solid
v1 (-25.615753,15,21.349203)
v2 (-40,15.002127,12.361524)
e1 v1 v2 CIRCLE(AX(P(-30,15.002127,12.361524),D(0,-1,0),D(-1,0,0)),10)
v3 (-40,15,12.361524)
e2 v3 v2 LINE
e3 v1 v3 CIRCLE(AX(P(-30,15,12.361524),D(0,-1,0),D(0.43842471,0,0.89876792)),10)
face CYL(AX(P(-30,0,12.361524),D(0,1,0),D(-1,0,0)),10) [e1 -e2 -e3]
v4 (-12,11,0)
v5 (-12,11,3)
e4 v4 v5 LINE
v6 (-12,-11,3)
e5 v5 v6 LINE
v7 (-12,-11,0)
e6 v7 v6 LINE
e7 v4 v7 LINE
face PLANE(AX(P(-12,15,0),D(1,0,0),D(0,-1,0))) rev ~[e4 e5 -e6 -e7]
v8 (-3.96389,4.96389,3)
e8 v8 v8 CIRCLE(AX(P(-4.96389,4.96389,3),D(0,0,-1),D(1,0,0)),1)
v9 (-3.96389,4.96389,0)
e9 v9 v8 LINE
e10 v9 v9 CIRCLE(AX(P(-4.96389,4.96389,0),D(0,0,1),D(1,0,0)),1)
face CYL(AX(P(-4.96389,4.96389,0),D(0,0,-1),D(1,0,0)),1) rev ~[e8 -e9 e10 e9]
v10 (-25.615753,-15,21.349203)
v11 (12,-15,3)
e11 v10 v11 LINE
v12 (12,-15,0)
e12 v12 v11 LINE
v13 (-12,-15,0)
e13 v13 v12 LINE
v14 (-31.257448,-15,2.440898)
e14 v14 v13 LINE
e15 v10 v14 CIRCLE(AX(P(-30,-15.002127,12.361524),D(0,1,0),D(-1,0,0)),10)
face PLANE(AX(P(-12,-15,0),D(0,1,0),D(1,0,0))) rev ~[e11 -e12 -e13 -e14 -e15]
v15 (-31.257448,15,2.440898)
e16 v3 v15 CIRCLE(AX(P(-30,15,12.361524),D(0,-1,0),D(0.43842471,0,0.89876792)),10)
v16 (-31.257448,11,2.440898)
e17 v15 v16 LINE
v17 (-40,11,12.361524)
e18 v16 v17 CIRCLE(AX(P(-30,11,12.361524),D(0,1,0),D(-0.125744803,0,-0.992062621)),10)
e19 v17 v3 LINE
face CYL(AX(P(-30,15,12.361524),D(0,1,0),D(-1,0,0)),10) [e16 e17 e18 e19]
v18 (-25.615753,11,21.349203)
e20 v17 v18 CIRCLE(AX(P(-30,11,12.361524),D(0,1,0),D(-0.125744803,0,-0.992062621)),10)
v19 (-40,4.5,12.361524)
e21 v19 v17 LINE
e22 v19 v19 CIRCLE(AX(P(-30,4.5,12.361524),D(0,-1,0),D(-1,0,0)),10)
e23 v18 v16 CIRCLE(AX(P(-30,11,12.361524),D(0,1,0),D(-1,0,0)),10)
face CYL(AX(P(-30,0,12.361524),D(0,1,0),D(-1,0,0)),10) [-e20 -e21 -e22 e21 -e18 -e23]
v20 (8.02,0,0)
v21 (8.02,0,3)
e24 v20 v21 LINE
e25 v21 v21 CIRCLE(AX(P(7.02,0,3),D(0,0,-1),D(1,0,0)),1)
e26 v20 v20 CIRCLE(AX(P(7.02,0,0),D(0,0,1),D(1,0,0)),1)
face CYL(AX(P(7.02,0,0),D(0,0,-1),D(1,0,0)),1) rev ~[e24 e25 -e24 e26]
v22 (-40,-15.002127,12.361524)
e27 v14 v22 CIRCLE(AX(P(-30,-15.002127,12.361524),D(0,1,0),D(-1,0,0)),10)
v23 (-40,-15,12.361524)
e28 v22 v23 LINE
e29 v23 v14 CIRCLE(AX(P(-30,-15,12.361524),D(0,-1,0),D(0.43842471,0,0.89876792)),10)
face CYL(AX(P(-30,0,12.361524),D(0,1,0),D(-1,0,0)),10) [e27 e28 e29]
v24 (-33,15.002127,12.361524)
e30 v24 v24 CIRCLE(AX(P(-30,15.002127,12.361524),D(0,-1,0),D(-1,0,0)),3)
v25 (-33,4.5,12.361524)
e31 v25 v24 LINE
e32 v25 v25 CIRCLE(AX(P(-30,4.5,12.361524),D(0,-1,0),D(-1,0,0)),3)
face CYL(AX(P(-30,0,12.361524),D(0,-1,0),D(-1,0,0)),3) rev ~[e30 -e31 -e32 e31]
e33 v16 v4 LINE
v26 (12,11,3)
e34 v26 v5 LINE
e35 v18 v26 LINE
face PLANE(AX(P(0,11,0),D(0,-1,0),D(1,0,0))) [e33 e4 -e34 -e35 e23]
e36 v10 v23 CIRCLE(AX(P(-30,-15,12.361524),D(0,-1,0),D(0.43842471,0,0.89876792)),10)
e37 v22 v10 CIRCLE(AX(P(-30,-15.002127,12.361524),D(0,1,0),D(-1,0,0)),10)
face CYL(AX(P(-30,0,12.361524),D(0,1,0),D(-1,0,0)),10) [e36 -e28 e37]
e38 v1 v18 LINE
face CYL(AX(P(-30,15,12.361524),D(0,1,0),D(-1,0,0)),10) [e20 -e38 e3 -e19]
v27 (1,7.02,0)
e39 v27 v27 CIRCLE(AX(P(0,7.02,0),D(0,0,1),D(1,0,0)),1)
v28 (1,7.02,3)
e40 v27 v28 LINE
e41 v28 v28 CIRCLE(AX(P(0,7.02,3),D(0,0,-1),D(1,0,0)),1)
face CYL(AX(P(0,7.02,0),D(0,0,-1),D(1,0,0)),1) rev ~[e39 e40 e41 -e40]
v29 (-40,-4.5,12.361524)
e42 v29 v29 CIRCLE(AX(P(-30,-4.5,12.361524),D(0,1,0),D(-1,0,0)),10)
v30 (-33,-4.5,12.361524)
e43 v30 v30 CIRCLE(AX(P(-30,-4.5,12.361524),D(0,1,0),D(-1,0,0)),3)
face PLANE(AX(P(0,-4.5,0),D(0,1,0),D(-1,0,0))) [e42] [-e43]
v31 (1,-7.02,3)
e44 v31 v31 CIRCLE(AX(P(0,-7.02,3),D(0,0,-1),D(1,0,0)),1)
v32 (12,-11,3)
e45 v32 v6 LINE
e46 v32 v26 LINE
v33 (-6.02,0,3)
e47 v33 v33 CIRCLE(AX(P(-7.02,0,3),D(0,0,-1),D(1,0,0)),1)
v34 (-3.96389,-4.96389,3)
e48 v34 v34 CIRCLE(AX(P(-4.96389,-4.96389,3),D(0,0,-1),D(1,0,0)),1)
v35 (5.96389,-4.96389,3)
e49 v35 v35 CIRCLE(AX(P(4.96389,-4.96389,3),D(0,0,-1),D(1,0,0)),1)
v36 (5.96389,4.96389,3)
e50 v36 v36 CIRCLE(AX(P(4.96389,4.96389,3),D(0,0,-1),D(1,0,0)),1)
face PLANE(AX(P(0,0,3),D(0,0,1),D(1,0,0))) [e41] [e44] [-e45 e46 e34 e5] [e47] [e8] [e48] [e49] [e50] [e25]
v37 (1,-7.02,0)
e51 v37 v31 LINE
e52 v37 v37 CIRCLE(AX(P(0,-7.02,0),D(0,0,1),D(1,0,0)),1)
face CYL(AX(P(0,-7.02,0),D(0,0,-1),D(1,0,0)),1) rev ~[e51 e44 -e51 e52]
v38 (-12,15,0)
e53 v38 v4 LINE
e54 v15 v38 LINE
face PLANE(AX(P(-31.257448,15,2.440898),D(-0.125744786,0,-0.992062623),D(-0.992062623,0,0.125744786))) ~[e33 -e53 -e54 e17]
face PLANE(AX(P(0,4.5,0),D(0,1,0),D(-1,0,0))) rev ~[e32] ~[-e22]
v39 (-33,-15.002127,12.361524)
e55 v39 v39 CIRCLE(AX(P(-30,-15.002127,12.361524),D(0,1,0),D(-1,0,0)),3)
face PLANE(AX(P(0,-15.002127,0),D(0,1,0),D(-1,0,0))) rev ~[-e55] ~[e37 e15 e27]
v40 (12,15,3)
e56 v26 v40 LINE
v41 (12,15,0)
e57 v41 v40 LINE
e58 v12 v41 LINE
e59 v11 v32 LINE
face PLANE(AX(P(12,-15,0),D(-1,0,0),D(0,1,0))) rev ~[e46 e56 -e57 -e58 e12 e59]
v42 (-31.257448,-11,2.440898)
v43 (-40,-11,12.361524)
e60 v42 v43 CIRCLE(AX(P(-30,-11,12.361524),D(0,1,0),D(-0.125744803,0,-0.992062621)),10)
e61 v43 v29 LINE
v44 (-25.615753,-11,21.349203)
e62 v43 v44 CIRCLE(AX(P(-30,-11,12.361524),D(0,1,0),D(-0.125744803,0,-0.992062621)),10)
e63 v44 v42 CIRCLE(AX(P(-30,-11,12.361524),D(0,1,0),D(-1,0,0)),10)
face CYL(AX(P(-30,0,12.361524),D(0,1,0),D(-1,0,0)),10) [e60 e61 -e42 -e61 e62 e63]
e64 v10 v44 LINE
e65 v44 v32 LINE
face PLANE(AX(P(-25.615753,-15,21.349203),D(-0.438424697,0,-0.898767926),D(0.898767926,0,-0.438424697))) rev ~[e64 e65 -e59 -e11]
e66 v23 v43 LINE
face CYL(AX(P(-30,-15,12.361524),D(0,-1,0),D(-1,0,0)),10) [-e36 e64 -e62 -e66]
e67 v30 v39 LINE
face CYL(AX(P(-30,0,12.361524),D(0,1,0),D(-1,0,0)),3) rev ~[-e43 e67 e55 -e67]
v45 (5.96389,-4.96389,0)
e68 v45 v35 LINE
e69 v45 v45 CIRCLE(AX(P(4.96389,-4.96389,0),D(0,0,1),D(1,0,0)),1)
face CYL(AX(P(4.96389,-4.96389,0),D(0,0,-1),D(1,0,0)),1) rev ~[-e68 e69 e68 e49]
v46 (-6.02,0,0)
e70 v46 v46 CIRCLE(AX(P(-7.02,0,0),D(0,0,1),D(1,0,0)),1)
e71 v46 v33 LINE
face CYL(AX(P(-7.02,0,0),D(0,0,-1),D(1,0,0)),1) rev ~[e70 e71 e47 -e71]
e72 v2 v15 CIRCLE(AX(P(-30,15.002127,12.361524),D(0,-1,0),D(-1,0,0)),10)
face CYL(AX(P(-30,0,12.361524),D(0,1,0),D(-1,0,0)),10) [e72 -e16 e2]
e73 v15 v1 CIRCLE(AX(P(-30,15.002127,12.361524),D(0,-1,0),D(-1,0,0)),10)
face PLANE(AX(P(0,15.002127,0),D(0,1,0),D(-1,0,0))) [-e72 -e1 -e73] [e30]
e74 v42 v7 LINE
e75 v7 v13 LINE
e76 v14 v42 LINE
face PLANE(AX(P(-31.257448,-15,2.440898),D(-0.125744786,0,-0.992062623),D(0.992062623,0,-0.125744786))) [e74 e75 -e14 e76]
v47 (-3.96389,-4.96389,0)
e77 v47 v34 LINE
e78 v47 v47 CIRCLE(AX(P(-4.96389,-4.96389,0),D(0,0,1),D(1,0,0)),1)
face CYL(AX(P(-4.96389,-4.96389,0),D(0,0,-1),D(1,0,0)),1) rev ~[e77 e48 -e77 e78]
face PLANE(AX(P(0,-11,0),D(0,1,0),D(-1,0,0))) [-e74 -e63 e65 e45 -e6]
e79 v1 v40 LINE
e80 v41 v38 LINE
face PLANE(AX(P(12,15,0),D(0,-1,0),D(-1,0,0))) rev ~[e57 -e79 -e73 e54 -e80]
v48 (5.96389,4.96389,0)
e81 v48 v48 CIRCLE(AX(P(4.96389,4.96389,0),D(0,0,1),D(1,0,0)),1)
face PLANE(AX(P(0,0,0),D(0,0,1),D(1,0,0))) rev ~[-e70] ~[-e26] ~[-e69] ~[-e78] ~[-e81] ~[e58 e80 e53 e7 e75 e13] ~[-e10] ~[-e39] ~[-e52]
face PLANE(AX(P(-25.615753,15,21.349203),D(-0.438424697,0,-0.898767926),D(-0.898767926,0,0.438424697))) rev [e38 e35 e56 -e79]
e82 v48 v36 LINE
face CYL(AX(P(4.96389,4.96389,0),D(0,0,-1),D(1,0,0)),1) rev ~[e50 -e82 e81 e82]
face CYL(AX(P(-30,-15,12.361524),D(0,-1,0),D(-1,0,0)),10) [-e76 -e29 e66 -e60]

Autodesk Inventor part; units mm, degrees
ref_plane "YZ Plane" through (0, 0, 0) normal (1, 0, 0) x (0, 1, 0)
ref_plane "XZ Plane" through (0, 0, 0) normal (0, 1, 0) x (-1, 0, 0)
ref_plane "XY Plane" through (0, 0, 0) normal (0, 0, 1) x (1, 0, 0)
sketch "Sketch2" plane through (0, 0, 0) normal (0, 0, 1) x (1, 0, 0)
  line L0 (-16.8, 0) -> (16.8, 0) construction
  line L1 (0, -21) -> (0, 21) construction
  line L2 (-12, -15) -> (12, -15)
  line L3 (12, -15) -> (12, 15)
  line L4 (12, 15) -> (-12, 15)
  line L5 (-12, 15) -> (-12, -15)
  circle A0 centre (7.02, 0) radius 1
  circle A1 centre (4.96389, 4.96389) radius 1
  circle A2 centre (0, 7.02) radius 1
  circle A3 centre (-4.96389, 4.96389) radius 1
  circle A4 centre (-7.02, 0) radius 1
  circle A5 centre (-4.96389, -4.96389) radius 1
  circle A6 centre (0, -7.02) radius 1
  circle A7 centre (4.96389, -4.96389) radius 1
  point P0 (0, 0)
  dimension "d3" = 30
  dimension "d4" = 24
  dimension "d5" = 7.02
  dimension "d6" = 2
  dimension "d9" = 360
extrude "Extrusion1" add sketch "Sketch2" along normal blind 3 contours L5 L4 L3 L2 | A0 | A1 | A2 | A3 | A4 | A5 | A6 | A7
sketch "Sketch1" plane through (0, 0, 0) normal (0, 1, 0) x (-1, 0, 0)
  line L0 (183.866798, 0) -> (-123.200788, 0) construction
  line L1 (-12, 0) -> (12, 0)
  line L2 (12, 0) -> (12, 3)
  line L3 (-12, 3) -> (12, 3)
  line L4 (-12, 0) -> (-12, 3)
  circle A0 centre (30, 12.361524) radius 10
  line L5 (-12, 0) -> (-12, 3)
  line L6 (25.615753, 21.349203) -> (-12, 3)
  line L7 (31.257448, 2.440898) -> (12, 0)
  circle A1 centre (30, 12.361524) radius 3
  dimension "d31" = 20
  dimension "d32" = 6
extrude "Extrusion6" add sketch "Sketch1" along normal blind 4 from surface at -15 contours L2 L3 L6 A0 L7 | A0 | A1
mirror "Mirror1" about plane through (0, 0, 0) normal (0, 1, 0) of "Extrusion6"
extrude "Extrusion7" cut sketch "Sketch2" along normal through all contours A0 | A1 | A2 | A3 | A4 | A5 | A6 | A7
extrude "Extrusion8" add sketch "Sketch1" along normal through all both and the other way through all contours A0 | A1
extrude "Extrusion9" cut sketch "Sketch1" along normal mid plane 9 contours A0 | A1
extrude "Extrusion10" cut sketch "Sketch1" along normal through all both and the other way through all contours A1
properties part number "bridge3"
